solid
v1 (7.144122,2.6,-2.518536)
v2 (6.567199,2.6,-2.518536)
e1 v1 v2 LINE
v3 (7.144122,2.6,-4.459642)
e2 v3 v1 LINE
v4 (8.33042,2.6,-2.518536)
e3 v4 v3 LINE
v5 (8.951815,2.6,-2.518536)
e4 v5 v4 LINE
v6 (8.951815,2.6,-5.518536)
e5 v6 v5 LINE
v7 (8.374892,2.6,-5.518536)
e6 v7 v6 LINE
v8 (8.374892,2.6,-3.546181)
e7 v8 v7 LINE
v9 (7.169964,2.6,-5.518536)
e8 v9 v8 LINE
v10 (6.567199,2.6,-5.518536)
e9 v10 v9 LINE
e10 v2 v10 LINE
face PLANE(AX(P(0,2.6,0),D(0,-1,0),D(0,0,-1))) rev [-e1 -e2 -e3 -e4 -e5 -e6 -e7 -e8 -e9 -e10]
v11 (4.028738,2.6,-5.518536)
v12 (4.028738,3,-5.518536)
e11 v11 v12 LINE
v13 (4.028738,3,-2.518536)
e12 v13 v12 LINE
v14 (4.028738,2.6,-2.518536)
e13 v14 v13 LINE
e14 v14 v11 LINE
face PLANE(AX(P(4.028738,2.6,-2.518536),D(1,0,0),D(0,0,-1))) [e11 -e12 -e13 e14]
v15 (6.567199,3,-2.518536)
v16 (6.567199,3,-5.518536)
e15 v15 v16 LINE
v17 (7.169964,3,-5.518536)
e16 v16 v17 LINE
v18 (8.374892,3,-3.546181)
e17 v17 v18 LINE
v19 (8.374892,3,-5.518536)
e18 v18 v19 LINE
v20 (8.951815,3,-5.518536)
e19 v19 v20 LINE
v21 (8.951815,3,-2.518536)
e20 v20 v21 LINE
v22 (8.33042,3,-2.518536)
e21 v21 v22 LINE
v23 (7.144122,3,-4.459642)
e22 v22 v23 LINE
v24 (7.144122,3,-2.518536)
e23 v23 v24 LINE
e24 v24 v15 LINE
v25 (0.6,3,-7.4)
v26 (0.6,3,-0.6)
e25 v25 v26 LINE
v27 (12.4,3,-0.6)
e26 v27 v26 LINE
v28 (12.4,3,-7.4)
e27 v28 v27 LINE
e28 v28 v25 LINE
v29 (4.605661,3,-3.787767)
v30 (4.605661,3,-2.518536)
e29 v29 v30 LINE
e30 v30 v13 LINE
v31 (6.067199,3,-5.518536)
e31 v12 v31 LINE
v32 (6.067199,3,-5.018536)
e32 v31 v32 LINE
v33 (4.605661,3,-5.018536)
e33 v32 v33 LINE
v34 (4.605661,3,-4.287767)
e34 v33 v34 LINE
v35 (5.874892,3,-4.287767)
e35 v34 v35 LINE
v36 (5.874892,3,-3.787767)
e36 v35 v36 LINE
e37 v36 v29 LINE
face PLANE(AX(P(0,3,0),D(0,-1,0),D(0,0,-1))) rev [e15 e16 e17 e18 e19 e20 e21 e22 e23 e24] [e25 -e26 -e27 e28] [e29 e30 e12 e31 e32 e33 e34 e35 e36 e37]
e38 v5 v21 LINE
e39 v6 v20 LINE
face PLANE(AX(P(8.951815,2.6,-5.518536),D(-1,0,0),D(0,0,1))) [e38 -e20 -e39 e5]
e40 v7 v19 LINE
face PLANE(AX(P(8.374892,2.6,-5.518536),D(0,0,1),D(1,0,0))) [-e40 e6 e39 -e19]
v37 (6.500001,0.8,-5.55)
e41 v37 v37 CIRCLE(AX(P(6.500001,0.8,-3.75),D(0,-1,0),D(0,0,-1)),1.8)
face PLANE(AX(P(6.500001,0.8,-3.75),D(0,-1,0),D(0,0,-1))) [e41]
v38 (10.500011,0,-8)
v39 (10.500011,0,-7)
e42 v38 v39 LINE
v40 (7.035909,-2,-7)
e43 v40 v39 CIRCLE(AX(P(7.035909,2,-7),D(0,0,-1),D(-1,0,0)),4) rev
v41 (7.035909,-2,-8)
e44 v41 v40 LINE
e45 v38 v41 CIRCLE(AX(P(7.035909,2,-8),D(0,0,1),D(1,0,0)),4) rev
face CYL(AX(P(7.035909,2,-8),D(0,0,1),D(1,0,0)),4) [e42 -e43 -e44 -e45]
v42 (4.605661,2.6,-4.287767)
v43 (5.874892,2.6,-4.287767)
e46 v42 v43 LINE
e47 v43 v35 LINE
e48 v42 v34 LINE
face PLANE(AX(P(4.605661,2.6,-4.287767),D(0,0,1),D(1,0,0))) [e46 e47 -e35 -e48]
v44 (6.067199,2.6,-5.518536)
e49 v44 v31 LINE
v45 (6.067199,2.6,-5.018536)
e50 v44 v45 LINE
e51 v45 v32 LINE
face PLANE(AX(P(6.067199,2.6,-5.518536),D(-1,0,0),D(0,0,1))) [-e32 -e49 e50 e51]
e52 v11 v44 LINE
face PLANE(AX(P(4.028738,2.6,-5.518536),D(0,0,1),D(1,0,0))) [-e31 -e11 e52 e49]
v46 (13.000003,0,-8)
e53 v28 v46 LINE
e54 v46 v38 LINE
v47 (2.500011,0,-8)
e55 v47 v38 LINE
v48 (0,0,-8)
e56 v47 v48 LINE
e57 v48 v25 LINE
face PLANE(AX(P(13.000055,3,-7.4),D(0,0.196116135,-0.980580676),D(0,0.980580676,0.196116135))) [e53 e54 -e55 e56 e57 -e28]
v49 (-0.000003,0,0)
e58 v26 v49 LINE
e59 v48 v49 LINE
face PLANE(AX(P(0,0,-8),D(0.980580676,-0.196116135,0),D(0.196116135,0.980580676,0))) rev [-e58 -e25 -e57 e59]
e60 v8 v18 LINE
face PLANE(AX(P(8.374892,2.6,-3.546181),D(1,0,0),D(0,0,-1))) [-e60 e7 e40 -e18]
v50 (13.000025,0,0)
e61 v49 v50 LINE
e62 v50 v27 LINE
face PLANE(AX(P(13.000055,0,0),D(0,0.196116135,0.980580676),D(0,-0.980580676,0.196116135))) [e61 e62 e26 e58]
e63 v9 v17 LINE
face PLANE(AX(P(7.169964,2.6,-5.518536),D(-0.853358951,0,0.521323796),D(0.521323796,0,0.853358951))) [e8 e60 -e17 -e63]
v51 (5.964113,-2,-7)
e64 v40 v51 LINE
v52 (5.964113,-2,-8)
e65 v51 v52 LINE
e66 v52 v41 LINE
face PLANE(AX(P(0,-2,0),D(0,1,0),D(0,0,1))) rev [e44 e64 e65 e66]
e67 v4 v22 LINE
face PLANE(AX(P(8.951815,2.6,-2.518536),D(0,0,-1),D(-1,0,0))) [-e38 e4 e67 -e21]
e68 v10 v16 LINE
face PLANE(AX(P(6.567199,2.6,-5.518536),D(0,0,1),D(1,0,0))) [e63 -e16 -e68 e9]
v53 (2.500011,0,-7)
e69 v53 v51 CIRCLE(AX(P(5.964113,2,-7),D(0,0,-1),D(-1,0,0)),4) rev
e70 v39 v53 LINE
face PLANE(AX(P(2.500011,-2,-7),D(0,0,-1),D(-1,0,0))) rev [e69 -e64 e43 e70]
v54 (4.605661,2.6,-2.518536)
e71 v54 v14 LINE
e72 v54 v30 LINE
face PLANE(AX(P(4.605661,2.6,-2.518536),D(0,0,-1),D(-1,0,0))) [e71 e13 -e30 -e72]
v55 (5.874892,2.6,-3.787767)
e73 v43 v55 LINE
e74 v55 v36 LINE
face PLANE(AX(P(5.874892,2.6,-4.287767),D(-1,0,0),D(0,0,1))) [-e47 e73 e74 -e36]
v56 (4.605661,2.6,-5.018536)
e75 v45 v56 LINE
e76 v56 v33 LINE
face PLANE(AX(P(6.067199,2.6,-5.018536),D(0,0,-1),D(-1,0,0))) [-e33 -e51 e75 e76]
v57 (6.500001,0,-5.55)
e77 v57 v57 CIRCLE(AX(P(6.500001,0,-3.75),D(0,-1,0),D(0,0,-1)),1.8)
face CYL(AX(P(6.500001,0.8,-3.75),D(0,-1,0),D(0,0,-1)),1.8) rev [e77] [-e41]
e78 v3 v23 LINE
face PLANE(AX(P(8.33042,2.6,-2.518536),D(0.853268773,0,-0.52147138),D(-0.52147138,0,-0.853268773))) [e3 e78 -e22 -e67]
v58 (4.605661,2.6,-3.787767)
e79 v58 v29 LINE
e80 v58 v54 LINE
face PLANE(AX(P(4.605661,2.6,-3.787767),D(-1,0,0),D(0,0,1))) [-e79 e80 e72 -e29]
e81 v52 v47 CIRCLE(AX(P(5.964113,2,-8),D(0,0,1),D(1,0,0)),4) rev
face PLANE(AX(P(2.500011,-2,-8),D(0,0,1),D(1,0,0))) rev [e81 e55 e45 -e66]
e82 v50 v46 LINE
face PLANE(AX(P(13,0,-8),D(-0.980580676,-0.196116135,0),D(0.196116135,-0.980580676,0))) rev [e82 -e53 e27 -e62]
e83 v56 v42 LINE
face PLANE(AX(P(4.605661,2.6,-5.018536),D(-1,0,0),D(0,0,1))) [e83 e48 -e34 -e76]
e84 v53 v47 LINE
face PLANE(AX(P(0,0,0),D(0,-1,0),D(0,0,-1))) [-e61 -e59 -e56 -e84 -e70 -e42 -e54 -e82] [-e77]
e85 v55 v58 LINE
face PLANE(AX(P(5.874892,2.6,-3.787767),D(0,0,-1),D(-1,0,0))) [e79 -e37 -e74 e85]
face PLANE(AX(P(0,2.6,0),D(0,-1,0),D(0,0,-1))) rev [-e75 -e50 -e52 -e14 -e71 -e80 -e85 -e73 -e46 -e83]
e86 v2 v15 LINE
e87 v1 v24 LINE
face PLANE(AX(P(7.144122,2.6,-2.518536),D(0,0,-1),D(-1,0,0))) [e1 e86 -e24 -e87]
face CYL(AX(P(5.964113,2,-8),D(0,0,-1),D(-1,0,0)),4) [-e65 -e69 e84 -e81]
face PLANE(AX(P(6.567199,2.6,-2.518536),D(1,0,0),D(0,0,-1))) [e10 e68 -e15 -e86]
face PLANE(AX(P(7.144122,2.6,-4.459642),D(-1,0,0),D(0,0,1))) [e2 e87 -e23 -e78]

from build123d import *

# Parameters (mm, degrees)
SKETCH1_W               = 13
SKETCH1_H               = 8
BOSS_EXTRUDE1_DEPTH     = 3
CUT_EXTRUDE1_DEPTH      = 16.556349186
CUT_EXTRUDE1_DEPTH_BACK = 16.556349186
CUT_EXTRUDE2_DEPTH      = 16.556349186
CUT_EXTRUDE2_DEPTH_BACK = 16.556349186
SKETCH4_R               = 1.8
CUT_EXTRUDE3_DEPTH      = 0.8
SKETCH5_W               = 8
SKETCH5_H               = 1
BOSS_EXTRUDE2_DEPTH     = 2
FILLET1_R               = 4
CUT_EXTRUDE4_DEPTH      = 0.4


with BuildPart() as part:
    # Sketch1 → Boss-Extrude1 (new body)
    with BuildSketch(Plane(origin=(0, 0, 0), x_dir=(1, 0, 0), z_dir=(0, 1, 0))):
        with Locations((6.5, 4)):
            Rectangle(SKETCH1_W, SKETCH1_H)
    extrude(amount=BOSS_EXTRUDE1_DEPTH)

    # Sketch2 → Cut-Extrude1 (cut, two sides: drawn at the far end of the back side and taken through both)
    with BuildSketch(Plane.XY.offset(-CUT_EXTRUDE1_DEPTH_BACK)):
        Polygon((0, 0), (0.6, 3), (0, 3), align=None)
        Polygon((13, 0), (12.4, 3), (13, 3), align=None)
    extrude(amount=CUT_EXTRUDE1_DEPTH + CUT_EXTRUDE1_DEPTH_BACK, mode=Mode.SUBTRACT)

    # Sketch3 → Cut-Extrude2 (cut, two sides: drawn at the far end of the back side and taken through both)
    with BuildSketch(Plane(origin=(0, 0, 0), x_dir=(0, 0, -1), z_dir=(1, 0, 0)).offset(-CUT_EXTRUDE2_DEPTH_BACK)):
        Polygon((0, 0), (0.6, 3), (0, 3), align=None)
        Polygon((8, 3), (7.4, 3), (8, 0), align=None)
    extrude(amount=CUT_EXTRUDE2_DEPTH + CUT_EXTRUDE2_DEPTH_BACK, mode=Mode.SUBTRACT)

    # Sketch4 → Cut-Extrude3 (cut)
    with BuildSketch(Plane.XZ):
        with Locations(Location((6.50000125, -3.75, 0), (0, 0, 270))):
            Circle(SKETCH4_R)
    extrude(amount=-CUT_EXTRUDE3_DEPTH, mode=Mode.SUBTRACT)

    # Sketch5 → Boss-Extrude2 (add)
    with BuildSketch(Plane.XZ):
        with Locations((6.500011, -7.5)):
            Rectangle(SKETCH5_W, SKETCH5_H)
    extrude(amount=BOSS_EXTRUDE2_DEPTH)

    # Fillet1
    # the kernel refuses this fillet: 4 mm, written as the material it takes off along each edge
    with BuildSketch(Plane(origin=(10.500011, -2, -16.660254038), x_dir=(0, 1, 0), z_dir=(0, 0, 1)), Plane(origin=(2.500011, -2, 1.660254038), x_dir=(0, 1, 0), z_dir=(0, 0, -1))) as fillet1_piece_1:
        with BuildLine():
            CenterArc((4, 3.464101615), FILLET1_R, 180, 60)
            Line((0, 3.464101615), (-0.08, 3.464101615))
            Line((-0.08, 3.464101615), (-0.08, 0))
            Line((-0.08, 0), (0, -0.08))
            ThreePointArc((0, -0.08), (1, -0.08), (1.96, -0.069282032))
            Line((1.96, -0.069282032), (2, 0))
        make_face()
    extrude(amount=18.320508076, mode=Mode.SUBTRACT)

    # Sketch6 → Cut-Extrude4 (cut)
    with BuildSketch(Plane(origin=(0, 3, 0), x_dir=(1, 0, 0), z_dir=(0, 1, 0))):
        Polygon((4.028737707, 2.518536397), (4.028737707, 5.518536397), (6.067199245, 5.518536397), (6.067199245, 5.018536397), (4.605660784, 5.018536397), (4.605660784, 4.287767167), (5.874891553, 4.287767167), (5.874891553, 3.787767167), (4.605660784, 3.787767167), (4.605660784, 2.518536397), align=None)
        Polygon((6.567199245, 2.518536397), (6.567199245, 5.518536397), (7.169963668, 5.518536397), (8.374891553, 3.546180628), (8.374891553, 5.518536397), (8.95181463, 5.518536397), (8.95181463, 2.518536397), (8.330420399, 2.518536397), (7.144122322, 4.459642167), (7.144122322, 2.518536397), align=None)
    extrude(amount=-CUT_EXTRUDE4_DEPTH, mode=Mode.SUBTRACT)


solid = part.part
